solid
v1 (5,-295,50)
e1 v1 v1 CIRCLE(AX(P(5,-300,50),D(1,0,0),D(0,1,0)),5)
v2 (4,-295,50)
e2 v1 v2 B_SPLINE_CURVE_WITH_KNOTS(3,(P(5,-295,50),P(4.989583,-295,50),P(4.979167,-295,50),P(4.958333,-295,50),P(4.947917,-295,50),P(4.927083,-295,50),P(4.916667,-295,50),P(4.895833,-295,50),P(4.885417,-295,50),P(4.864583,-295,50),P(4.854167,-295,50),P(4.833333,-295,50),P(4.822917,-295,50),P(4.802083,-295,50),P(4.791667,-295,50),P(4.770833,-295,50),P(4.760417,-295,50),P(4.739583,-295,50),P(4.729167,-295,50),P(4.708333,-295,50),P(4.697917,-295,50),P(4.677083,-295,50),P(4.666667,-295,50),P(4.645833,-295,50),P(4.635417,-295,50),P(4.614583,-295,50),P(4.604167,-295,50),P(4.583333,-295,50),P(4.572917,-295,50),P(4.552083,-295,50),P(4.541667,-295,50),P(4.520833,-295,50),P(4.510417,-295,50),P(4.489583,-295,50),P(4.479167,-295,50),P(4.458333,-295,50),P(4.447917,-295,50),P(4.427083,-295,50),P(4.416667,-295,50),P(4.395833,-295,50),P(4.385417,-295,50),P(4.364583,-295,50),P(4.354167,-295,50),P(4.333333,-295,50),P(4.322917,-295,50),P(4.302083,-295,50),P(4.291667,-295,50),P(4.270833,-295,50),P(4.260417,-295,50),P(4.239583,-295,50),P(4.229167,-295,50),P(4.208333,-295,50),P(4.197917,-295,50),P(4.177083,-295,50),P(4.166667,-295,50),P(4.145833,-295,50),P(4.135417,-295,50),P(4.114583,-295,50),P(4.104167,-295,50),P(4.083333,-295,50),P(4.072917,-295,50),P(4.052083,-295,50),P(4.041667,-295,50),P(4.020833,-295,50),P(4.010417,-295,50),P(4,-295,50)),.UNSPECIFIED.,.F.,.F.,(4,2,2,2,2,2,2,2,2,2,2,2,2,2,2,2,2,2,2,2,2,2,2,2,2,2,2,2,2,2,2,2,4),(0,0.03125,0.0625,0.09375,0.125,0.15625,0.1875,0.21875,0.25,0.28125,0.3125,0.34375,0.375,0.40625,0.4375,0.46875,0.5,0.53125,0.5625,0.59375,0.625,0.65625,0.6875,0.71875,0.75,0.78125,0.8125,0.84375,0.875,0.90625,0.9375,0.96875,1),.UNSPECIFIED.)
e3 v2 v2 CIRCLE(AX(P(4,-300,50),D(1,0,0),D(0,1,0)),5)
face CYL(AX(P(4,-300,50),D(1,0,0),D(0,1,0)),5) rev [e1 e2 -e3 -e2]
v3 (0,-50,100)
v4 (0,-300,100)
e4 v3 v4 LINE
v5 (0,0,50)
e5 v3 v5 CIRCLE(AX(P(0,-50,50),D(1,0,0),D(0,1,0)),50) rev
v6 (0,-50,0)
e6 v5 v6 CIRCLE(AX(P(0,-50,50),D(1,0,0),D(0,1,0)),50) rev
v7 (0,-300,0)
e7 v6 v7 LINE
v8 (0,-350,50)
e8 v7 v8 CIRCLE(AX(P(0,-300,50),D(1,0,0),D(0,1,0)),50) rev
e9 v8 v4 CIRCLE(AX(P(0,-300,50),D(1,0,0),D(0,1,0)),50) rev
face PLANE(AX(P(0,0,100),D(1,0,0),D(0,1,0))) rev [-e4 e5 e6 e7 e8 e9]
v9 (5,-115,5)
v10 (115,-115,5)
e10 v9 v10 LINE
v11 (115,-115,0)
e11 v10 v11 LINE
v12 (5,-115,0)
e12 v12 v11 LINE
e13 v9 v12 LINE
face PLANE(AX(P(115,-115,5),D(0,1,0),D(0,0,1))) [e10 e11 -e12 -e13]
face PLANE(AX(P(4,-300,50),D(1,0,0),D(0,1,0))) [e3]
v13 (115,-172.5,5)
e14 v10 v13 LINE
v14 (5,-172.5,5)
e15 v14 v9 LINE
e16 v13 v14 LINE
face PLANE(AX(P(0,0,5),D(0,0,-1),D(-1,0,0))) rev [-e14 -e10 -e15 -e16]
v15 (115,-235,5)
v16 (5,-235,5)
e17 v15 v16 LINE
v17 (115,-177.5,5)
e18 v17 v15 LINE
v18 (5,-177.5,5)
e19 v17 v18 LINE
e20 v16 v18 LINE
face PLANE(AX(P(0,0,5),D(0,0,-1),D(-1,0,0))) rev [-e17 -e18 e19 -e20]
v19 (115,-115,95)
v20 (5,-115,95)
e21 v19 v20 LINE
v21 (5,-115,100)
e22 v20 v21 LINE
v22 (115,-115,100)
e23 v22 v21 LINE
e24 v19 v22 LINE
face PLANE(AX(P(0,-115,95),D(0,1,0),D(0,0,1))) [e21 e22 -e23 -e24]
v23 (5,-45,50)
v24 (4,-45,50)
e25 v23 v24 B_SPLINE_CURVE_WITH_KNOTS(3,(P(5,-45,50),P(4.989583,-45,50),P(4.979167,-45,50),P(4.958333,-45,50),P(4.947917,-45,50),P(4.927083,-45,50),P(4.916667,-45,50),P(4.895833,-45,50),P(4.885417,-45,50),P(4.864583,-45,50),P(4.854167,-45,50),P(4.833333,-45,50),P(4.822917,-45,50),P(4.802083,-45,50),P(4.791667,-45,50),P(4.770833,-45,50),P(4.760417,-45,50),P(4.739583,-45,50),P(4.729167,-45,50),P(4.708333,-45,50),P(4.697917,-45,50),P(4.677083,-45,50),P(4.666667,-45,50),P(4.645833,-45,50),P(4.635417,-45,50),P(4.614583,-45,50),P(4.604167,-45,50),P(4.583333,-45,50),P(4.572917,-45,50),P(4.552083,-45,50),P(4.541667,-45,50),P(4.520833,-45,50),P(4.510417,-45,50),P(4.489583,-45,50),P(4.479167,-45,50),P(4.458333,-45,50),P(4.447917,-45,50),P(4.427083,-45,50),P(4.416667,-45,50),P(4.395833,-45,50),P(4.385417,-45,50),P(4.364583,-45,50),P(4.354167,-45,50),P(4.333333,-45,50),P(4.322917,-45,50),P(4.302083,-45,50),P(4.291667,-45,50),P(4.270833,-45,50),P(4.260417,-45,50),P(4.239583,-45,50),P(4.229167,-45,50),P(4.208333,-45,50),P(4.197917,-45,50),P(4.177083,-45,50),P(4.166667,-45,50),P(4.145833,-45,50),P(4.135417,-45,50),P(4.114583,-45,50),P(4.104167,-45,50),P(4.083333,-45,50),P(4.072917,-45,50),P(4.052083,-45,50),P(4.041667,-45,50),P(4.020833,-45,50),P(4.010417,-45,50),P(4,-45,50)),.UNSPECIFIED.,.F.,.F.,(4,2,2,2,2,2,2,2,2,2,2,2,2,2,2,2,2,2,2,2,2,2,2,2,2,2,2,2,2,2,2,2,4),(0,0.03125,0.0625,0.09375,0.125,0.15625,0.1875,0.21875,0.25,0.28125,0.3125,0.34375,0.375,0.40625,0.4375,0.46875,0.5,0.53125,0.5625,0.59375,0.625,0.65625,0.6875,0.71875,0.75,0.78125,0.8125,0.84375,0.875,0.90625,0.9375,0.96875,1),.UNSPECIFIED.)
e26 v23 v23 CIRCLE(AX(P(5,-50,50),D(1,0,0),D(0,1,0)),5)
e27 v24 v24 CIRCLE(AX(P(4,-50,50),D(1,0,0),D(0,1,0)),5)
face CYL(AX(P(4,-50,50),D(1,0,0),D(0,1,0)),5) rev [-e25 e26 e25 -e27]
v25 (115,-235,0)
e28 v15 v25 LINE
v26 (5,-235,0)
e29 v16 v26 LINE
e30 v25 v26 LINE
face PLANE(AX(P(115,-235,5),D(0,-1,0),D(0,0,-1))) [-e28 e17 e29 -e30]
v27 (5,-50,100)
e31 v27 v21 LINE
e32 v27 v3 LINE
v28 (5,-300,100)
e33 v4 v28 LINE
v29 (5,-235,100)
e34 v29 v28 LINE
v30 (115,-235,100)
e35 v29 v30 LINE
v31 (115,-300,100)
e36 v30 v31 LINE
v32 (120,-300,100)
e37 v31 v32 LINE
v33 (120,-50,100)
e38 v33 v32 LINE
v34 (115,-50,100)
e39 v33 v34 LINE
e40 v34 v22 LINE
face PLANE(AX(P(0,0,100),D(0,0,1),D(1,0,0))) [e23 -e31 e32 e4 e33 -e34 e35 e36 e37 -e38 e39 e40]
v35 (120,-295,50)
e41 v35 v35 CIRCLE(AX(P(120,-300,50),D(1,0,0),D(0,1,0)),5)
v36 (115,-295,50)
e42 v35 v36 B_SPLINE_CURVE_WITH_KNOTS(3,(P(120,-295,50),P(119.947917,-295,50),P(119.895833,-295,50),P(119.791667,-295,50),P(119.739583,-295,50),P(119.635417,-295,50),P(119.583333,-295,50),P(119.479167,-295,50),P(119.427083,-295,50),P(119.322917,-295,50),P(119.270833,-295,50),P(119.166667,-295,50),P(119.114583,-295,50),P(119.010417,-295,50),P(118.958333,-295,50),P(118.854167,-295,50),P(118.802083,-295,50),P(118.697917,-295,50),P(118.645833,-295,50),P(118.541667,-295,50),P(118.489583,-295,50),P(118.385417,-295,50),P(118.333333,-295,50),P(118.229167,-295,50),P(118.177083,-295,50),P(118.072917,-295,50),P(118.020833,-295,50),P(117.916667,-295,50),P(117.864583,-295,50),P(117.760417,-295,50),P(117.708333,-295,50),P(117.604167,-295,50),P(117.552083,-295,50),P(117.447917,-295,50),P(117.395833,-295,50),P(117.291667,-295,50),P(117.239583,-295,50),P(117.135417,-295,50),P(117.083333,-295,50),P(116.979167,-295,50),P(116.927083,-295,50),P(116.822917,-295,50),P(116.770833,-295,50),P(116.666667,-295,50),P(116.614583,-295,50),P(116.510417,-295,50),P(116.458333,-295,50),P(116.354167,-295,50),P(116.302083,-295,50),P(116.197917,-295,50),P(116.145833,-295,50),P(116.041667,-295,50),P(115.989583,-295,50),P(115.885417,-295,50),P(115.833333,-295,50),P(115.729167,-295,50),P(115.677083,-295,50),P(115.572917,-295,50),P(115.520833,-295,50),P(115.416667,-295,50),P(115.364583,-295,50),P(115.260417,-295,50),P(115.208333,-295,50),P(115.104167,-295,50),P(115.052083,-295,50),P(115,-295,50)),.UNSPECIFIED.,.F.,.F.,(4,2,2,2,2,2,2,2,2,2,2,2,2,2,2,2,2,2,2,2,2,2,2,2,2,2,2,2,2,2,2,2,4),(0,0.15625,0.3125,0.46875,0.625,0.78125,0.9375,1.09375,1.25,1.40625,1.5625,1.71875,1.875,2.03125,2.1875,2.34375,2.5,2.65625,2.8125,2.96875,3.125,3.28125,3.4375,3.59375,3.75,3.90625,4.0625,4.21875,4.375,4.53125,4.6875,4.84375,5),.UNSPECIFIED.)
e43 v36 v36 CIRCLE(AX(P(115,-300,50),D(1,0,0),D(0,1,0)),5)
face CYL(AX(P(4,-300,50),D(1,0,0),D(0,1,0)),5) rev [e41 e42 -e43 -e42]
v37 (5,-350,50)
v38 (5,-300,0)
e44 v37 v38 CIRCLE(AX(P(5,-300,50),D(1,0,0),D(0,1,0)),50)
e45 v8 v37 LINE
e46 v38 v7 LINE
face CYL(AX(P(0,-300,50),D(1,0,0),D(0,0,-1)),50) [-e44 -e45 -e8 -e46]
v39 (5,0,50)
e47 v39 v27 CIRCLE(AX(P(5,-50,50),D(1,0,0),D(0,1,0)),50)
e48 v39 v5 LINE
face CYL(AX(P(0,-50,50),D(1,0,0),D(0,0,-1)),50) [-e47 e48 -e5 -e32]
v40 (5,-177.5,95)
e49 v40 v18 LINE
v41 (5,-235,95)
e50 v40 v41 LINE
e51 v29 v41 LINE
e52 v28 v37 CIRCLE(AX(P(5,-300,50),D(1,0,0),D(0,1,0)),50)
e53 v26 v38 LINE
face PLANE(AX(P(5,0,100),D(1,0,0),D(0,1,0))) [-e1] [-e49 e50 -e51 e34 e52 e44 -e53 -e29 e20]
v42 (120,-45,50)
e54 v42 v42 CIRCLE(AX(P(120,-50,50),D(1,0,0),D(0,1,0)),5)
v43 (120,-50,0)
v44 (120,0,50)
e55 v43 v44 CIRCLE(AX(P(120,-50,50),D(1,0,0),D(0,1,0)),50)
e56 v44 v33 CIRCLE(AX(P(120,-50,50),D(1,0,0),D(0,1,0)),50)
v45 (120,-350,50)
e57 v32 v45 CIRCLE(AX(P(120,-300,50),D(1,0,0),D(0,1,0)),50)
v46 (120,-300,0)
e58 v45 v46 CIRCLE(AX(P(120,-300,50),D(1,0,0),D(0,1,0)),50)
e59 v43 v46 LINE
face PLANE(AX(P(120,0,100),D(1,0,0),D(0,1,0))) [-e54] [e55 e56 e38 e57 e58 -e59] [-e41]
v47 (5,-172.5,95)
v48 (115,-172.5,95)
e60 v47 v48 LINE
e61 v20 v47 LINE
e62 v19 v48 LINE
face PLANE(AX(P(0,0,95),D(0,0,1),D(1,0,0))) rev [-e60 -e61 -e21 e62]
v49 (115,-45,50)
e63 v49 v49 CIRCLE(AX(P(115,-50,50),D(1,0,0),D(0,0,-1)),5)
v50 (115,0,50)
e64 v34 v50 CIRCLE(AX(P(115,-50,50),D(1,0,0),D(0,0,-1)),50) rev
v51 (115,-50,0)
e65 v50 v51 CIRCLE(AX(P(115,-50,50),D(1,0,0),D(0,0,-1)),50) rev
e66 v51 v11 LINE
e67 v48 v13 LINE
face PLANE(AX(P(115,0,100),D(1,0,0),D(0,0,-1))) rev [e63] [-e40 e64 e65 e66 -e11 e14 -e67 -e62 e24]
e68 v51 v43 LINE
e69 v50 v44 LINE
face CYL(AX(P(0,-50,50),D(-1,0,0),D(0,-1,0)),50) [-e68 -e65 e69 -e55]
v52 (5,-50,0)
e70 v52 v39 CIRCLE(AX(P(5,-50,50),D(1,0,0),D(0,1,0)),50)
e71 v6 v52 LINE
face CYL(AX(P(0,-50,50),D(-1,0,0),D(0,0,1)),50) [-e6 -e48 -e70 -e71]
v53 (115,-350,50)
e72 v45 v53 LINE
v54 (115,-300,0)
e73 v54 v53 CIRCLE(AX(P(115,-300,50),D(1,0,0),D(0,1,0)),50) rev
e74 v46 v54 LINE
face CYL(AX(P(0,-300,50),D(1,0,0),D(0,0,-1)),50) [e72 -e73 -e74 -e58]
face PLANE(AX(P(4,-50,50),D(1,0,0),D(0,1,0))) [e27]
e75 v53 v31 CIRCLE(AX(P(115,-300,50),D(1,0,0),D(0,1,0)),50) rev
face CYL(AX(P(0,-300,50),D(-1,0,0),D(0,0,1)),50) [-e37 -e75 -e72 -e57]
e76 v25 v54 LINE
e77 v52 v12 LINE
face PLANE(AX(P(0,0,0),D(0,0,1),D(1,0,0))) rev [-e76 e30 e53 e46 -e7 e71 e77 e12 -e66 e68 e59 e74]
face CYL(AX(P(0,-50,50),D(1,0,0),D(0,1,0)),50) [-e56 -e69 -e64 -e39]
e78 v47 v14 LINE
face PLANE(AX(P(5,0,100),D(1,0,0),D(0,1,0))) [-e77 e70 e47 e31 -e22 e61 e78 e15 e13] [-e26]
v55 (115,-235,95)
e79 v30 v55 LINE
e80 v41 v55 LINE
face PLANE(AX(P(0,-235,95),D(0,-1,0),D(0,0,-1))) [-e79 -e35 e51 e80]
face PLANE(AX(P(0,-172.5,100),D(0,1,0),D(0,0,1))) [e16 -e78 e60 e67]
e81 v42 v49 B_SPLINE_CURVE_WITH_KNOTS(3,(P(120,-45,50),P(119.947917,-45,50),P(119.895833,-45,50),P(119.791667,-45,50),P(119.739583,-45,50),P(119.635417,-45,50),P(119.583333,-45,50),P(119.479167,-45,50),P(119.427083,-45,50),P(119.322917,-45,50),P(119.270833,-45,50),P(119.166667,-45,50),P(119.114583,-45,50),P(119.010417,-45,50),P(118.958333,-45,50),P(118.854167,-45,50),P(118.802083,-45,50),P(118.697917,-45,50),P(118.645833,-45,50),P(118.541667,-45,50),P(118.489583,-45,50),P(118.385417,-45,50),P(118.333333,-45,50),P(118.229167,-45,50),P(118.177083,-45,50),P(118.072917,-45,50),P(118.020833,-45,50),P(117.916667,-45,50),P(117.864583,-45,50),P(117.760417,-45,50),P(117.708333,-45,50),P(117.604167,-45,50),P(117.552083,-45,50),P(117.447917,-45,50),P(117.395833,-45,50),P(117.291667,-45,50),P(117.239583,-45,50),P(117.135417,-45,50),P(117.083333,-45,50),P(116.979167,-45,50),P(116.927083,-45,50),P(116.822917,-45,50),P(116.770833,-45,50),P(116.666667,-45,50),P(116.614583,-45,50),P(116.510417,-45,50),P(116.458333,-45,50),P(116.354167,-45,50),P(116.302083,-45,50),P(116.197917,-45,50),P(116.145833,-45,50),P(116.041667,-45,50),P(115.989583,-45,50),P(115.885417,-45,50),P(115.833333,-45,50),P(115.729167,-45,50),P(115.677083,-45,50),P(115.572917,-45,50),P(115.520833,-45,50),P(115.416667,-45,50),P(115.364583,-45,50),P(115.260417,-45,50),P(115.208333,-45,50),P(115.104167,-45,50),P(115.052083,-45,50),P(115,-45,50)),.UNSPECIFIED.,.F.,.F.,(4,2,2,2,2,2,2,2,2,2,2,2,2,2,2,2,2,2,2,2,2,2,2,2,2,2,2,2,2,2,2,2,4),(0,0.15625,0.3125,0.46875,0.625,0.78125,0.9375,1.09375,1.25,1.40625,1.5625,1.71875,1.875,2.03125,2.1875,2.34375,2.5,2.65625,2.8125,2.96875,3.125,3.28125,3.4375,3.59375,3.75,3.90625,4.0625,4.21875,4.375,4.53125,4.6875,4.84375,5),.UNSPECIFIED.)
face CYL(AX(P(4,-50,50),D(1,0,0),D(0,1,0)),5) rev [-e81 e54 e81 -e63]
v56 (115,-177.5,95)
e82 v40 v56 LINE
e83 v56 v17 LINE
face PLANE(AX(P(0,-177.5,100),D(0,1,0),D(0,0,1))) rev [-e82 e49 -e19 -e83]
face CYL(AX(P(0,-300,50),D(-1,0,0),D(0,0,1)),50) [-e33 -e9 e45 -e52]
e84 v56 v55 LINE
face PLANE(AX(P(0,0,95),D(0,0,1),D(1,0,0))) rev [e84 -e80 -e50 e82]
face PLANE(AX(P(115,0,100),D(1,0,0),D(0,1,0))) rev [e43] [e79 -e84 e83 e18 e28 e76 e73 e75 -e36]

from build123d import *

# Parameters (mm, degrees)
BOSS_EXTRUDE1_DEPTH = 100
FILLET1_R           = 50
SKETCH2_R           = 5
CUT_EXTRUDE1_DEPTH  = 116
SKETCH5_W           = 120
SKETCH5_H           = 120
BOSS_EXTRUDE4_DEPTH = 5
SKETCH6_W           = 110
SKETCH6_H           = 120
BOSS_EXTRUDE6_DEPTH = 5


with BuildPart() as part:
    # Sketch1 → Boss-Extrude1 (new body)
    with BuildSketch(Plane.XY):
        Polygon((5, -172.5), (5, -8), (5, 0), (0, 0), (0, -8), (0, -146), (0, -154), (0, -292), (0, -350), (5, -350), (5, -292), (5, -177.5), (115, -177.5), (115, -293.5), (115, -350), (120, -350), (120, -293.5), (120, -155.5), (120, -147.5), (120, -9.5), (120, 0), (115, 0), (115, -9.5), (115, -172.5), align=None)
    extrude(amount=BOSS_EXTRUDE1_DEPTH)

    # Fillet1
    fillet1_edges = [part.edges().sort_by_distance(p)[0] for p in [
        (2.5, 0, 100),
        (2.5, 0, 0),
        (117.5, -350, 0),
        (117.5, -350, 100),
        (2.5, -350, 100),
        (2.5, -350, 0),
        (117.5, 0, 100),
        (117.5, 0, 0),
    ]]
    fillet(fillet1_edges, radius=FILLET1_R - 0.0001)  # a hair under: the kernel refuses the full size

    # Sketch2 → Cut-Extrude1 (cut)
    with BuildSketch(Plane(origin=(120, 0, 0), x_dir=(0, 0, -1), z_dir=(1, 0, 0))):
        with Locations(Location((-50, -300, 0), (0, 0, 90))):
            Circle(SKETCH2_R)
        with Locations(Location((-50, -50, 0), (0, 0, 90))):
            Circle(SKETCH2_R)
    extrude(amount=-CUT_EXTRUDE1_DEPTH, mode=Mode.SUBTRACT)

    # Sketch5 → Boss-Extrude4 (add)
    with BuildSketch(Plane.XY.offset(100)):
        with Locations((60, -175)):
            Rectangle(SKETCH5_W, SKETCH5_H)
    extrude(amount=-BOSS_EXTRUDE4_DEPTH)

    # Sketch6 → Boss-Extrude6 (add)
    with BuildSketch(Plane(origin=(0, 0, 0), x_dir=(-1, 0, 0), z_dir=(0, 0, -1))):
        with Locations((-60, -175)):
            Rectangle(SKETCH6_W, SKETCH6_H)
    extrude(amount=-BOSS_EXTRUDE6_DEPTH)


solid = part.part
